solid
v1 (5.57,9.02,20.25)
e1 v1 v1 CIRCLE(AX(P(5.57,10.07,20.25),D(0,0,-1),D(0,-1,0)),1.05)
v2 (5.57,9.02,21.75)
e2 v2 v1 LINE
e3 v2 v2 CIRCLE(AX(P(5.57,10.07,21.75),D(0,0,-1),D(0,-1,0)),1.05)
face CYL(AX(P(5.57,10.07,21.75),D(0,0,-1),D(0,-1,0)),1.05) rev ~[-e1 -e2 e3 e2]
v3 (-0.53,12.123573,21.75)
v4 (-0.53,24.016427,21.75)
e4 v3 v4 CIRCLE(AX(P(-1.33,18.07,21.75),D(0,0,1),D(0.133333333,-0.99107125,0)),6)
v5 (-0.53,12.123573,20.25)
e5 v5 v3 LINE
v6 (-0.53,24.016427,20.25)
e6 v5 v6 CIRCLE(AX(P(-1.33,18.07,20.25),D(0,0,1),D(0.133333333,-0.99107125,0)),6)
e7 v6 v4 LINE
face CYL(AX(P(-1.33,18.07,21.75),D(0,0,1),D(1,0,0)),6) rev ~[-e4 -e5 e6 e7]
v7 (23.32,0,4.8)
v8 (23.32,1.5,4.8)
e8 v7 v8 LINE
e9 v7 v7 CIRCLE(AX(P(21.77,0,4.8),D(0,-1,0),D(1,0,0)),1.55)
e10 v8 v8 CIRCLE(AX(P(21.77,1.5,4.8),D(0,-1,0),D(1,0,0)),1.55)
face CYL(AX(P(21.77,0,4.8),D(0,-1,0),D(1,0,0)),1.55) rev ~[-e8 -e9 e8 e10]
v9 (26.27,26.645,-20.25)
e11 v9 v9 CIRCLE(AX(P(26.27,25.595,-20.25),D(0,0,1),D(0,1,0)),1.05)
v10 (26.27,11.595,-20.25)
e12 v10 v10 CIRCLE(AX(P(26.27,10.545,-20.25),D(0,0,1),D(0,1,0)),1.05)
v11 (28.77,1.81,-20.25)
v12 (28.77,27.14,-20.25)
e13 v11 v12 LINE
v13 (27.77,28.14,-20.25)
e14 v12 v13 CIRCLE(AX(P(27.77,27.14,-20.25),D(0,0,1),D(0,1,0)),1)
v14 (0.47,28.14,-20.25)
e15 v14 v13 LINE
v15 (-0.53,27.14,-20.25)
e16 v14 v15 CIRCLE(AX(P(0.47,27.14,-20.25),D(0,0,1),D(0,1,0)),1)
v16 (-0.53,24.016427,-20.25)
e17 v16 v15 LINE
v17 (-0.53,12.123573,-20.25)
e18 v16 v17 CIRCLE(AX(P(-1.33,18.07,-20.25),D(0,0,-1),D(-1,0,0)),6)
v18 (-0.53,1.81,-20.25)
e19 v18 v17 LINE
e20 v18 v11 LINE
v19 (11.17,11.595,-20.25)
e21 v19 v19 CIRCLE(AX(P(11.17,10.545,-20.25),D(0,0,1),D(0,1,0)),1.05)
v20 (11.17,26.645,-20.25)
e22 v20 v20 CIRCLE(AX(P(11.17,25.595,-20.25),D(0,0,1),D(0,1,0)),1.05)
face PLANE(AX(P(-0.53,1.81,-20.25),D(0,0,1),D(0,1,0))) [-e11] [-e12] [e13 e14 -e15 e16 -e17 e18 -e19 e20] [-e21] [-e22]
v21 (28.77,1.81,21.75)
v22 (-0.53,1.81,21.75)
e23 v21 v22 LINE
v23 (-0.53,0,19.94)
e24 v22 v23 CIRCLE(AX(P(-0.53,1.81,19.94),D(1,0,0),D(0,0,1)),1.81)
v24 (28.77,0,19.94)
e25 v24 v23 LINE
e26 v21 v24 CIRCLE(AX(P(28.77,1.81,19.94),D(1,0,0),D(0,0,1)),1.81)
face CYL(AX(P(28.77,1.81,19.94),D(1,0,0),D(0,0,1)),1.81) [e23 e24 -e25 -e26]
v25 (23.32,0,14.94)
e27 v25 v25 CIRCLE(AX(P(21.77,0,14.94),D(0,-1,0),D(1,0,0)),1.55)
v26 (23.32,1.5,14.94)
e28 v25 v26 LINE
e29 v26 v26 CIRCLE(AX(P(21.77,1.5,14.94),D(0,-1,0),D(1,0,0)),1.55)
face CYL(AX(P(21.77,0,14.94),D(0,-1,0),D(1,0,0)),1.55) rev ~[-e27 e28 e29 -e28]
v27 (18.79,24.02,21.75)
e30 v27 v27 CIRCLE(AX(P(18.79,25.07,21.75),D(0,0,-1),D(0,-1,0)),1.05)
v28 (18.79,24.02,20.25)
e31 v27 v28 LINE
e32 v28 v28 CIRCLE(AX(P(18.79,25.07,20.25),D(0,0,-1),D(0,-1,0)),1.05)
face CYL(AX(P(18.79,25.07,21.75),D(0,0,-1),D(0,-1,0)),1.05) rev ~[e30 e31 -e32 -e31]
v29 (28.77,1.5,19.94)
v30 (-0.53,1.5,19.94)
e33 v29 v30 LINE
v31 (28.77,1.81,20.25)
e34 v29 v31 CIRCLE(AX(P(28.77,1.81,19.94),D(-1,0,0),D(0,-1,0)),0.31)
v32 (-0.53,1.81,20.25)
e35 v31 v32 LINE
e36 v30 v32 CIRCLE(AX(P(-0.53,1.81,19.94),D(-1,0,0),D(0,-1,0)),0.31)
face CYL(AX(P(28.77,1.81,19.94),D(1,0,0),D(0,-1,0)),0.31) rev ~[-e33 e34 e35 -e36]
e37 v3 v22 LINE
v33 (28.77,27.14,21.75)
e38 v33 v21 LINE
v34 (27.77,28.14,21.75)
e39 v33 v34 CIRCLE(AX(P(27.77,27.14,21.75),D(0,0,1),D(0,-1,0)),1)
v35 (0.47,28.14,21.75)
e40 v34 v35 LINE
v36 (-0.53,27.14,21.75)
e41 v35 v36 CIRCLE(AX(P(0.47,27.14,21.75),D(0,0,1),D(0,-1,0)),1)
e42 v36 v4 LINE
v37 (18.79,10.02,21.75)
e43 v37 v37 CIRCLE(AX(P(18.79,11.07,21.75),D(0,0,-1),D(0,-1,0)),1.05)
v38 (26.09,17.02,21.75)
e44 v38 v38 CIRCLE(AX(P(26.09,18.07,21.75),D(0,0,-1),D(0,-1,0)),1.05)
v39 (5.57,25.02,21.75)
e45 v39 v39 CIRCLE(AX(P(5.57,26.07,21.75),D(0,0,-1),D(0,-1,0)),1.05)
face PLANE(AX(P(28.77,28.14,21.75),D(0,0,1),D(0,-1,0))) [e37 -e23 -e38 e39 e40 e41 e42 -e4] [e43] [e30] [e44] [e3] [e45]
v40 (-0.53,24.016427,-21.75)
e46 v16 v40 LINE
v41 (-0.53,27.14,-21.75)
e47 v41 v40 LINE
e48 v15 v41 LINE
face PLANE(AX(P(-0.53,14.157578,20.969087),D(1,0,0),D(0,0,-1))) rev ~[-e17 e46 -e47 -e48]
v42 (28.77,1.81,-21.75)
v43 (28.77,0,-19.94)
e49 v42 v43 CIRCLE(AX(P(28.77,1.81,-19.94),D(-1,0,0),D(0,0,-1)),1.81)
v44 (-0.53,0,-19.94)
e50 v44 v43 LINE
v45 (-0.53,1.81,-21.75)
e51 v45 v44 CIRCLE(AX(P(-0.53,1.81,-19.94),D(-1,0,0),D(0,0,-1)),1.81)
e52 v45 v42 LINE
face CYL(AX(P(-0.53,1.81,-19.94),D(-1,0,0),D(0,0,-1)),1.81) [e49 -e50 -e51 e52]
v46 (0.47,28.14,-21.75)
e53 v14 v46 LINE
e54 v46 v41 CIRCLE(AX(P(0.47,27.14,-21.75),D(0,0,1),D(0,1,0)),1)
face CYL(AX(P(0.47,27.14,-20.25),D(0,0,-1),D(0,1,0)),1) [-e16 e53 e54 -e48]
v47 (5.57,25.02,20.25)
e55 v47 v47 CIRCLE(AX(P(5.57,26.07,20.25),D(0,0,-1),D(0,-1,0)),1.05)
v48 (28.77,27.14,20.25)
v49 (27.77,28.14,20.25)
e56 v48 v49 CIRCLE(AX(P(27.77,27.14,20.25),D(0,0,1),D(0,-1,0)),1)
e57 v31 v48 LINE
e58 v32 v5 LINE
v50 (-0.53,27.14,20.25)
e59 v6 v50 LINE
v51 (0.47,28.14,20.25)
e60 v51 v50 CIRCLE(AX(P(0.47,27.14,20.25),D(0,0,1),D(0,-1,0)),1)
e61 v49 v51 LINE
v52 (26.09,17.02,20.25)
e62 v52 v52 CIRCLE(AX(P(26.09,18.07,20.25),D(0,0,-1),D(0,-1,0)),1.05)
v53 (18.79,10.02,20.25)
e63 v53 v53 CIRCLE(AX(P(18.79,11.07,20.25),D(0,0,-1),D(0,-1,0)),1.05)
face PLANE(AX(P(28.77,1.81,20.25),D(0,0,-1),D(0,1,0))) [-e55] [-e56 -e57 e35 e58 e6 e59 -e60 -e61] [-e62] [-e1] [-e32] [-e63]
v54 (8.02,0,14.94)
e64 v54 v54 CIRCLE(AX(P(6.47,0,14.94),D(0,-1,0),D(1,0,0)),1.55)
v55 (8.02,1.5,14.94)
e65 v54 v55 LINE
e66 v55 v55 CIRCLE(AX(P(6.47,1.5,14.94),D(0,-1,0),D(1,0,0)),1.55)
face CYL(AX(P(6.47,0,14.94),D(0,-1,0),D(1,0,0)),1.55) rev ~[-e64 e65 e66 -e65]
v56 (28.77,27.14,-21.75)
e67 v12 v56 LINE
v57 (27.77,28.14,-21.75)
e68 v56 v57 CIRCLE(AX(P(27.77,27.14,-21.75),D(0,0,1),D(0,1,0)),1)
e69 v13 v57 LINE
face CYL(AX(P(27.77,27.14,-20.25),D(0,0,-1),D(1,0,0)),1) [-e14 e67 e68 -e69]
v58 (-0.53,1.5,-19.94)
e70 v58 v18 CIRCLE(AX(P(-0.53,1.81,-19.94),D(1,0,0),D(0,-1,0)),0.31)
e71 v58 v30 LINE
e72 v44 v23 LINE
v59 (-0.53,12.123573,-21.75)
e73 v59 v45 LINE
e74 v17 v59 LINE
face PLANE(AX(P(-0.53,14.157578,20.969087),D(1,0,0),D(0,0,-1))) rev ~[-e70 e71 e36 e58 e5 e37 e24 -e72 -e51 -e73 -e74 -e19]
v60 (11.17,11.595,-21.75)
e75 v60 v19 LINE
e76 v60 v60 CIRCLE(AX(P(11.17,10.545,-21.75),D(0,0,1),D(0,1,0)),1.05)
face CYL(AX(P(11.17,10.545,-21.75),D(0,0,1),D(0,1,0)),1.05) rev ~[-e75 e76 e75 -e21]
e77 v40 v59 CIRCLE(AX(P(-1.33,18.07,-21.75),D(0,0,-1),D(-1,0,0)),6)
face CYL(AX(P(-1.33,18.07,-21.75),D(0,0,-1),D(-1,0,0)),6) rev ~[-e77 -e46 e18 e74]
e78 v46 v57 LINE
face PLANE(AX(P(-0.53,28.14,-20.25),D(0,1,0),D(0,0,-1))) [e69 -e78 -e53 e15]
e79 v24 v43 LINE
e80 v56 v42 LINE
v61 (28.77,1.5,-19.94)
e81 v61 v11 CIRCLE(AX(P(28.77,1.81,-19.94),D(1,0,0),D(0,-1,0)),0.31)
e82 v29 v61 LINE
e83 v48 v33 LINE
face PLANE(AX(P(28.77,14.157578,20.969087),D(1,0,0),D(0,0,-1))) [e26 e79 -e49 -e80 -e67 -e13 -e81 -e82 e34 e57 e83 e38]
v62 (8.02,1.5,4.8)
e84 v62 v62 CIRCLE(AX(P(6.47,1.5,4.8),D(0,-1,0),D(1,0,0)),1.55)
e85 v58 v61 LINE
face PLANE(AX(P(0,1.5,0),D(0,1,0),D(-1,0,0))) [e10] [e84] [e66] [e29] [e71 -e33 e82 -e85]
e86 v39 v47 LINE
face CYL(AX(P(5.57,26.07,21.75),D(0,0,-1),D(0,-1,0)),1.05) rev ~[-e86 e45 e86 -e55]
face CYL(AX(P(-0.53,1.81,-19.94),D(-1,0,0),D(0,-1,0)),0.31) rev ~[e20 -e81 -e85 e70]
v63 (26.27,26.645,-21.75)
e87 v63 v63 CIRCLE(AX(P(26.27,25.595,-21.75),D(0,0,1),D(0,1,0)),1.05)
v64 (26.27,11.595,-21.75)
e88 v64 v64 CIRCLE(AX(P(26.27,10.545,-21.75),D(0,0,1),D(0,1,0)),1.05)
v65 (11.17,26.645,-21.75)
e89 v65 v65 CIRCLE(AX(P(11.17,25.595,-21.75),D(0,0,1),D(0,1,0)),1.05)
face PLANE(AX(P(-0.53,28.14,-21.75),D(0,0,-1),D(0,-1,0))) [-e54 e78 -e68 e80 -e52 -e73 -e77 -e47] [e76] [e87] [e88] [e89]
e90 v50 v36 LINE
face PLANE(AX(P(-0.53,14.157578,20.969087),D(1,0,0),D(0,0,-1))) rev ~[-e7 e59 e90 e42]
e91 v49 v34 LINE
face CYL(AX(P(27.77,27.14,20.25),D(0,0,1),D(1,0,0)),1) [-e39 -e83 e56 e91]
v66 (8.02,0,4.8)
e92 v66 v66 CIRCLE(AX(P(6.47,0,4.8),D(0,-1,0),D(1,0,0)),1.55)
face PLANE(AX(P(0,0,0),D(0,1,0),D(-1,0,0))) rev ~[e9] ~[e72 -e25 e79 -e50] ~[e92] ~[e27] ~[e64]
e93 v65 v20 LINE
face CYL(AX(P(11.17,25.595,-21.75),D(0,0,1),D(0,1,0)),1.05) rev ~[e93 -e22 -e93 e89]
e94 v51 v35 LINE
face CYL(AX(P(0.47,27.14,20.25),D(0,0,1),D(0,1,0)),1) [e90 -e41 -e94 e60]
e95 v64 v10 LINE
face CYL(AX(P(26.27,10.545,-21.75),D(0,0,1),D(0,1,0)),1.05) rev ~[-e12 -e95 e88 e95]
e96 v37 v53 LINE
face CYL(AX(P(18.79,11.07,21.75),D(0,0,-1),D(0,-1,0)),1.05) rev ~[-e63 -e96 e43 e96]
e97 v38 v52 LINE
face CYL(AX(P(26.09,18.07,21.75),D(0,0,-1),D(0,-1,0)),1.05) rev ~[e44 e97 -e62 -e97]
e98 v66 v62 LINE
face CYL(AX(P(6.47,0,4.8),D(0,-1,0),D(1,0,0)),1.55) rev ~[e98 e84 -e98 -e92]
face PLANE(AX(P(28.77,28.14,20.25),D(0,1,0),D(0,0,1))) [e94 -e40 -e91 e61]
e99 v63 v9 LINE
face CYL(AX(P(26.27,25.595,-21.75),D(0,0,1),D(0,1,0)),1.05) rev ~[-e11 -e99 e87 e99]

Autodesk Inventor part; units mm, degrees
ref_plane "YZ Plane" through (0, 0, 0) normal (1, 0, 0) x (0, 1, 0)
ref_plane "XZ Plane" through (0, 0, 0) normal (0, 1, 0) x (-1, 0, 0)
ref_plane "XY Plane" through (0, 0, 0) normal (0, 0, 1) x (1, 0, 0)
sketch "Sketch1" plane through (0, 0, 0) normal (0, 1, 0) x (-1, 0, 0)
  line L0 (0.53, 20.25) -> (-28.77, 20.25)
  line L1 (-28.77, 20.25) -> (-28.77, -20.25)
  line L2 (-28.77, -20.25) -> (0.53, -20.25)
  line L3 (0.53, -20.25) -> (0.53, 20.25)
  point P0 (0, 0)
  dimension "d0" = 40.5
  dimension "d1" = 29.3
  dimension "d2" = -0.53
  dimension "d3" = 20.25
extrude "Plate1" add sketch "Sketch1" along normal blind 1.5
sketch "Sketch2" plane through (28.77, 0, 21.75) normal (0, 0, -1) x (-1, 0, 0)
  line L0 (29.3, 0) -> (0, 0)
  line L1 (0, 0) -> (0, 28.14)
  line L2 (0, 28.14) -> (29.3, 28.14)
  line L3 (29.3, 28.14) -> (29.3, 0)
edge flange "Flange1" height 28.14 angle 90 thickness 1.5 bend radius 0.31 thickness toward (0, 0, -1) relief tear relief width 1.5 relief depth 0.75 corner gap 0.31 corner form 0 edges at (14.12, 1.5, 20.25) (14.12, 1.5, -20.25) wall of the first edge with corners at (-0.53, 0, 21.75) (28.77, 0, 21.75) (28.77, 28.14, 21.75) (-0.53, 28.14, 21.75)
bend "Bend1"
corner "Corner1"
sketch "Sketch6" plane through (-0.53, 28.14, 21.75) normal (0, 0, 1) x (1, 0, 0)
  point P0 (0.53, -28.14)
sketch "Sketch8" plane through (28.77, 28.14, -21.75) normal (0, 0, -1) x (-1, 0, 0)
  circle A0 centre (2.5, -2.545) radius 0.7835
  circle A1 centre (2.5, -17.595) radius 0.7835
  circle A2 centre (17.6, -2.545) radius 0.7835
  circle A3 centre (17.6, -17.595) radius 0.7835
  circle A4 centre (37.6, -2.545) radius 0.7835
  circle A5 centre (37.6, -17.595) radius 0.7835
  point P0 (28.77, -28.14)
hole "Hole4" at (26.27, 25.595, -21.75) at (26.27, 10.545, -21.75) at (11.17, 25.595, -21.75) at (11.17, 10.545, -21.75) at (-8.83, 25.595, -21.75) at (-8.83, 10.545, -21.75) direction (0, 0, 1) diameter 2.1 depth 1.5
sketch "Sketch9" plane through (28.77, 28.14, -21.75) normal (0, 0, -1) x (-1, 0, 0)
  circle A0 centre (30.1, -10.07) radius 6
  point P0 (28.77, -28.14)
extrude "Cut2" cut sketch "Sketch9" against normal blind 1.5
sketch "Sketch10" plane through (-0.53, 28.14, 21.75) normal (0, 0, 1) x (1, 0, 0)
  point P0 (0.53, -28.14)
sketch "Sketch11" plane through (-0.53, 28.14, 21.75) normal (0, 0, 1) x (1, 0, 0)
  point P0 (0.53, -28.14)
sketch "Sketch15" plane through (0, 0, 0) normal (0, -1, 0) x (1, 0, 0)
  point P0 (0, 0)
sketch "Sketch16" plane through (0, 0, 0) normal (0, -1, 0) x (1, 0, 0)
  circle A0 centre (6.47, 14.94) radius 1.55
  line L0 (28.77, 19.94) -> (-0.53, 19.94) projected
  line L1 (-0.53, -19.94) -> (-0.53, 19.94) projected
  circle A1 centre (21.77, 14.94) radius 1.55
  line L2 (28.77, 19.94) -> (28.77, -19.94) projected
  circle A2 centre (6.47, 4.8) radius 1.55
  circle A3 centre (21.77, 4.8) radius 1.55
  point P0 (0, 0)
  dimension "d65" = 3.1
  dimension "d66" = 5
  dimension "d67" = 7
  dimension "d68" = 3.1
  dimension "d69" = 5
  dimension "d70" = 7
  dimension "d71" = 3.1
  dimension "d72" = 15.14
  dimension "d73" = 7
  dimension "d74" = 3.1
  dimension "d75" = 15.14
  dimension "d76" = 7
extrude "Cut6" cut sketch "Sketch16" against normal blind 1.5
sketch "Sketch18" plane through (-0.53, 28.14, 21.75) normal (0, 0, 1) x (1, 0, 0)
  circle A0 centre (-0.8, -10.07) radius 6
  point P0 (0.53, -28.14)
extrude "Cut7" cut sketch "Sketch18" against normal blind 1.5
fillet "Corner Round1" radius 1 4 edges at (-0.53, 28.14, -21) (28.77, 28.14, -21) (28.77, 28.14, 21) (-0.53, 28.14, 21)
sketch "Sketch19" plane through (-0.53, 1.81, 21.75) normal (0, 0, 1) x (1, 0, 0)
  circle A0 centre (6.1, 24.26) radius 0.7835
  circle A1 centre (19.32, 23.26) radius 0.7835
  circle A2 centre (26.62, 16.26) radius 0.7835
  circle A3 centre (19.32, 9.26) radius 0.7835
  circle A4 centre (6.1, 8.26) radius 0.7835
  point P0 (0.53, -1.81)
hole "Hole6" at (5.57, 26.07, 21.75) at (18.79, 25.07, 21.75) at (26.09, 18.07, 21.75) at (18.79, 11.07, 21.75) at (5.57, 10.07, 21.75) direction (0, 0, -1) diameter 2.1 depth 1.5
equation "\"d55\" = Thickness"
equation "\"d57\" = Thickness"
equation "\"d77\" = Thickness"
equation "\"d86\" = Thickness"
equation "\"d94\" = Thickness"
equation "\"d4\" = Thickness"
equation "\"d5\" = BendReliefWidth"
equation "\"d6\" = BendReliefDepth"
equation "\"d7\" = MinimumRemnant"
equation "\"d8\" = TransitionRadius"
equation "\"d11\" = BendRadius"
equation "\"d12\" = CornerReliefSize"
equation "\"d13\" = GapSize"
equation "\"d14\" = JacobiRadiusSize"
equation "\"BendReliefWidth\" = Thickness"
equation "\"BendReliefDepth\" = 0.5 * Thickness"
equation "\"CornerReliefSize\" = 4 * Thickness"
equation "\"MinimumRemnant\" = 2 * Thickness"
equation "\"TransitionRadius\" = BendRadius"
equation "\"JacobiRadiusSize\" = BendRadius"
equation "\"GapSize\" = Thickness"
equation "\"Thickness\" = 1.5"
equation "\"BendRadius\" = 0.31"
properties part number "axis_25_bottom_frame" material "Aluminum 6061-AHC"
